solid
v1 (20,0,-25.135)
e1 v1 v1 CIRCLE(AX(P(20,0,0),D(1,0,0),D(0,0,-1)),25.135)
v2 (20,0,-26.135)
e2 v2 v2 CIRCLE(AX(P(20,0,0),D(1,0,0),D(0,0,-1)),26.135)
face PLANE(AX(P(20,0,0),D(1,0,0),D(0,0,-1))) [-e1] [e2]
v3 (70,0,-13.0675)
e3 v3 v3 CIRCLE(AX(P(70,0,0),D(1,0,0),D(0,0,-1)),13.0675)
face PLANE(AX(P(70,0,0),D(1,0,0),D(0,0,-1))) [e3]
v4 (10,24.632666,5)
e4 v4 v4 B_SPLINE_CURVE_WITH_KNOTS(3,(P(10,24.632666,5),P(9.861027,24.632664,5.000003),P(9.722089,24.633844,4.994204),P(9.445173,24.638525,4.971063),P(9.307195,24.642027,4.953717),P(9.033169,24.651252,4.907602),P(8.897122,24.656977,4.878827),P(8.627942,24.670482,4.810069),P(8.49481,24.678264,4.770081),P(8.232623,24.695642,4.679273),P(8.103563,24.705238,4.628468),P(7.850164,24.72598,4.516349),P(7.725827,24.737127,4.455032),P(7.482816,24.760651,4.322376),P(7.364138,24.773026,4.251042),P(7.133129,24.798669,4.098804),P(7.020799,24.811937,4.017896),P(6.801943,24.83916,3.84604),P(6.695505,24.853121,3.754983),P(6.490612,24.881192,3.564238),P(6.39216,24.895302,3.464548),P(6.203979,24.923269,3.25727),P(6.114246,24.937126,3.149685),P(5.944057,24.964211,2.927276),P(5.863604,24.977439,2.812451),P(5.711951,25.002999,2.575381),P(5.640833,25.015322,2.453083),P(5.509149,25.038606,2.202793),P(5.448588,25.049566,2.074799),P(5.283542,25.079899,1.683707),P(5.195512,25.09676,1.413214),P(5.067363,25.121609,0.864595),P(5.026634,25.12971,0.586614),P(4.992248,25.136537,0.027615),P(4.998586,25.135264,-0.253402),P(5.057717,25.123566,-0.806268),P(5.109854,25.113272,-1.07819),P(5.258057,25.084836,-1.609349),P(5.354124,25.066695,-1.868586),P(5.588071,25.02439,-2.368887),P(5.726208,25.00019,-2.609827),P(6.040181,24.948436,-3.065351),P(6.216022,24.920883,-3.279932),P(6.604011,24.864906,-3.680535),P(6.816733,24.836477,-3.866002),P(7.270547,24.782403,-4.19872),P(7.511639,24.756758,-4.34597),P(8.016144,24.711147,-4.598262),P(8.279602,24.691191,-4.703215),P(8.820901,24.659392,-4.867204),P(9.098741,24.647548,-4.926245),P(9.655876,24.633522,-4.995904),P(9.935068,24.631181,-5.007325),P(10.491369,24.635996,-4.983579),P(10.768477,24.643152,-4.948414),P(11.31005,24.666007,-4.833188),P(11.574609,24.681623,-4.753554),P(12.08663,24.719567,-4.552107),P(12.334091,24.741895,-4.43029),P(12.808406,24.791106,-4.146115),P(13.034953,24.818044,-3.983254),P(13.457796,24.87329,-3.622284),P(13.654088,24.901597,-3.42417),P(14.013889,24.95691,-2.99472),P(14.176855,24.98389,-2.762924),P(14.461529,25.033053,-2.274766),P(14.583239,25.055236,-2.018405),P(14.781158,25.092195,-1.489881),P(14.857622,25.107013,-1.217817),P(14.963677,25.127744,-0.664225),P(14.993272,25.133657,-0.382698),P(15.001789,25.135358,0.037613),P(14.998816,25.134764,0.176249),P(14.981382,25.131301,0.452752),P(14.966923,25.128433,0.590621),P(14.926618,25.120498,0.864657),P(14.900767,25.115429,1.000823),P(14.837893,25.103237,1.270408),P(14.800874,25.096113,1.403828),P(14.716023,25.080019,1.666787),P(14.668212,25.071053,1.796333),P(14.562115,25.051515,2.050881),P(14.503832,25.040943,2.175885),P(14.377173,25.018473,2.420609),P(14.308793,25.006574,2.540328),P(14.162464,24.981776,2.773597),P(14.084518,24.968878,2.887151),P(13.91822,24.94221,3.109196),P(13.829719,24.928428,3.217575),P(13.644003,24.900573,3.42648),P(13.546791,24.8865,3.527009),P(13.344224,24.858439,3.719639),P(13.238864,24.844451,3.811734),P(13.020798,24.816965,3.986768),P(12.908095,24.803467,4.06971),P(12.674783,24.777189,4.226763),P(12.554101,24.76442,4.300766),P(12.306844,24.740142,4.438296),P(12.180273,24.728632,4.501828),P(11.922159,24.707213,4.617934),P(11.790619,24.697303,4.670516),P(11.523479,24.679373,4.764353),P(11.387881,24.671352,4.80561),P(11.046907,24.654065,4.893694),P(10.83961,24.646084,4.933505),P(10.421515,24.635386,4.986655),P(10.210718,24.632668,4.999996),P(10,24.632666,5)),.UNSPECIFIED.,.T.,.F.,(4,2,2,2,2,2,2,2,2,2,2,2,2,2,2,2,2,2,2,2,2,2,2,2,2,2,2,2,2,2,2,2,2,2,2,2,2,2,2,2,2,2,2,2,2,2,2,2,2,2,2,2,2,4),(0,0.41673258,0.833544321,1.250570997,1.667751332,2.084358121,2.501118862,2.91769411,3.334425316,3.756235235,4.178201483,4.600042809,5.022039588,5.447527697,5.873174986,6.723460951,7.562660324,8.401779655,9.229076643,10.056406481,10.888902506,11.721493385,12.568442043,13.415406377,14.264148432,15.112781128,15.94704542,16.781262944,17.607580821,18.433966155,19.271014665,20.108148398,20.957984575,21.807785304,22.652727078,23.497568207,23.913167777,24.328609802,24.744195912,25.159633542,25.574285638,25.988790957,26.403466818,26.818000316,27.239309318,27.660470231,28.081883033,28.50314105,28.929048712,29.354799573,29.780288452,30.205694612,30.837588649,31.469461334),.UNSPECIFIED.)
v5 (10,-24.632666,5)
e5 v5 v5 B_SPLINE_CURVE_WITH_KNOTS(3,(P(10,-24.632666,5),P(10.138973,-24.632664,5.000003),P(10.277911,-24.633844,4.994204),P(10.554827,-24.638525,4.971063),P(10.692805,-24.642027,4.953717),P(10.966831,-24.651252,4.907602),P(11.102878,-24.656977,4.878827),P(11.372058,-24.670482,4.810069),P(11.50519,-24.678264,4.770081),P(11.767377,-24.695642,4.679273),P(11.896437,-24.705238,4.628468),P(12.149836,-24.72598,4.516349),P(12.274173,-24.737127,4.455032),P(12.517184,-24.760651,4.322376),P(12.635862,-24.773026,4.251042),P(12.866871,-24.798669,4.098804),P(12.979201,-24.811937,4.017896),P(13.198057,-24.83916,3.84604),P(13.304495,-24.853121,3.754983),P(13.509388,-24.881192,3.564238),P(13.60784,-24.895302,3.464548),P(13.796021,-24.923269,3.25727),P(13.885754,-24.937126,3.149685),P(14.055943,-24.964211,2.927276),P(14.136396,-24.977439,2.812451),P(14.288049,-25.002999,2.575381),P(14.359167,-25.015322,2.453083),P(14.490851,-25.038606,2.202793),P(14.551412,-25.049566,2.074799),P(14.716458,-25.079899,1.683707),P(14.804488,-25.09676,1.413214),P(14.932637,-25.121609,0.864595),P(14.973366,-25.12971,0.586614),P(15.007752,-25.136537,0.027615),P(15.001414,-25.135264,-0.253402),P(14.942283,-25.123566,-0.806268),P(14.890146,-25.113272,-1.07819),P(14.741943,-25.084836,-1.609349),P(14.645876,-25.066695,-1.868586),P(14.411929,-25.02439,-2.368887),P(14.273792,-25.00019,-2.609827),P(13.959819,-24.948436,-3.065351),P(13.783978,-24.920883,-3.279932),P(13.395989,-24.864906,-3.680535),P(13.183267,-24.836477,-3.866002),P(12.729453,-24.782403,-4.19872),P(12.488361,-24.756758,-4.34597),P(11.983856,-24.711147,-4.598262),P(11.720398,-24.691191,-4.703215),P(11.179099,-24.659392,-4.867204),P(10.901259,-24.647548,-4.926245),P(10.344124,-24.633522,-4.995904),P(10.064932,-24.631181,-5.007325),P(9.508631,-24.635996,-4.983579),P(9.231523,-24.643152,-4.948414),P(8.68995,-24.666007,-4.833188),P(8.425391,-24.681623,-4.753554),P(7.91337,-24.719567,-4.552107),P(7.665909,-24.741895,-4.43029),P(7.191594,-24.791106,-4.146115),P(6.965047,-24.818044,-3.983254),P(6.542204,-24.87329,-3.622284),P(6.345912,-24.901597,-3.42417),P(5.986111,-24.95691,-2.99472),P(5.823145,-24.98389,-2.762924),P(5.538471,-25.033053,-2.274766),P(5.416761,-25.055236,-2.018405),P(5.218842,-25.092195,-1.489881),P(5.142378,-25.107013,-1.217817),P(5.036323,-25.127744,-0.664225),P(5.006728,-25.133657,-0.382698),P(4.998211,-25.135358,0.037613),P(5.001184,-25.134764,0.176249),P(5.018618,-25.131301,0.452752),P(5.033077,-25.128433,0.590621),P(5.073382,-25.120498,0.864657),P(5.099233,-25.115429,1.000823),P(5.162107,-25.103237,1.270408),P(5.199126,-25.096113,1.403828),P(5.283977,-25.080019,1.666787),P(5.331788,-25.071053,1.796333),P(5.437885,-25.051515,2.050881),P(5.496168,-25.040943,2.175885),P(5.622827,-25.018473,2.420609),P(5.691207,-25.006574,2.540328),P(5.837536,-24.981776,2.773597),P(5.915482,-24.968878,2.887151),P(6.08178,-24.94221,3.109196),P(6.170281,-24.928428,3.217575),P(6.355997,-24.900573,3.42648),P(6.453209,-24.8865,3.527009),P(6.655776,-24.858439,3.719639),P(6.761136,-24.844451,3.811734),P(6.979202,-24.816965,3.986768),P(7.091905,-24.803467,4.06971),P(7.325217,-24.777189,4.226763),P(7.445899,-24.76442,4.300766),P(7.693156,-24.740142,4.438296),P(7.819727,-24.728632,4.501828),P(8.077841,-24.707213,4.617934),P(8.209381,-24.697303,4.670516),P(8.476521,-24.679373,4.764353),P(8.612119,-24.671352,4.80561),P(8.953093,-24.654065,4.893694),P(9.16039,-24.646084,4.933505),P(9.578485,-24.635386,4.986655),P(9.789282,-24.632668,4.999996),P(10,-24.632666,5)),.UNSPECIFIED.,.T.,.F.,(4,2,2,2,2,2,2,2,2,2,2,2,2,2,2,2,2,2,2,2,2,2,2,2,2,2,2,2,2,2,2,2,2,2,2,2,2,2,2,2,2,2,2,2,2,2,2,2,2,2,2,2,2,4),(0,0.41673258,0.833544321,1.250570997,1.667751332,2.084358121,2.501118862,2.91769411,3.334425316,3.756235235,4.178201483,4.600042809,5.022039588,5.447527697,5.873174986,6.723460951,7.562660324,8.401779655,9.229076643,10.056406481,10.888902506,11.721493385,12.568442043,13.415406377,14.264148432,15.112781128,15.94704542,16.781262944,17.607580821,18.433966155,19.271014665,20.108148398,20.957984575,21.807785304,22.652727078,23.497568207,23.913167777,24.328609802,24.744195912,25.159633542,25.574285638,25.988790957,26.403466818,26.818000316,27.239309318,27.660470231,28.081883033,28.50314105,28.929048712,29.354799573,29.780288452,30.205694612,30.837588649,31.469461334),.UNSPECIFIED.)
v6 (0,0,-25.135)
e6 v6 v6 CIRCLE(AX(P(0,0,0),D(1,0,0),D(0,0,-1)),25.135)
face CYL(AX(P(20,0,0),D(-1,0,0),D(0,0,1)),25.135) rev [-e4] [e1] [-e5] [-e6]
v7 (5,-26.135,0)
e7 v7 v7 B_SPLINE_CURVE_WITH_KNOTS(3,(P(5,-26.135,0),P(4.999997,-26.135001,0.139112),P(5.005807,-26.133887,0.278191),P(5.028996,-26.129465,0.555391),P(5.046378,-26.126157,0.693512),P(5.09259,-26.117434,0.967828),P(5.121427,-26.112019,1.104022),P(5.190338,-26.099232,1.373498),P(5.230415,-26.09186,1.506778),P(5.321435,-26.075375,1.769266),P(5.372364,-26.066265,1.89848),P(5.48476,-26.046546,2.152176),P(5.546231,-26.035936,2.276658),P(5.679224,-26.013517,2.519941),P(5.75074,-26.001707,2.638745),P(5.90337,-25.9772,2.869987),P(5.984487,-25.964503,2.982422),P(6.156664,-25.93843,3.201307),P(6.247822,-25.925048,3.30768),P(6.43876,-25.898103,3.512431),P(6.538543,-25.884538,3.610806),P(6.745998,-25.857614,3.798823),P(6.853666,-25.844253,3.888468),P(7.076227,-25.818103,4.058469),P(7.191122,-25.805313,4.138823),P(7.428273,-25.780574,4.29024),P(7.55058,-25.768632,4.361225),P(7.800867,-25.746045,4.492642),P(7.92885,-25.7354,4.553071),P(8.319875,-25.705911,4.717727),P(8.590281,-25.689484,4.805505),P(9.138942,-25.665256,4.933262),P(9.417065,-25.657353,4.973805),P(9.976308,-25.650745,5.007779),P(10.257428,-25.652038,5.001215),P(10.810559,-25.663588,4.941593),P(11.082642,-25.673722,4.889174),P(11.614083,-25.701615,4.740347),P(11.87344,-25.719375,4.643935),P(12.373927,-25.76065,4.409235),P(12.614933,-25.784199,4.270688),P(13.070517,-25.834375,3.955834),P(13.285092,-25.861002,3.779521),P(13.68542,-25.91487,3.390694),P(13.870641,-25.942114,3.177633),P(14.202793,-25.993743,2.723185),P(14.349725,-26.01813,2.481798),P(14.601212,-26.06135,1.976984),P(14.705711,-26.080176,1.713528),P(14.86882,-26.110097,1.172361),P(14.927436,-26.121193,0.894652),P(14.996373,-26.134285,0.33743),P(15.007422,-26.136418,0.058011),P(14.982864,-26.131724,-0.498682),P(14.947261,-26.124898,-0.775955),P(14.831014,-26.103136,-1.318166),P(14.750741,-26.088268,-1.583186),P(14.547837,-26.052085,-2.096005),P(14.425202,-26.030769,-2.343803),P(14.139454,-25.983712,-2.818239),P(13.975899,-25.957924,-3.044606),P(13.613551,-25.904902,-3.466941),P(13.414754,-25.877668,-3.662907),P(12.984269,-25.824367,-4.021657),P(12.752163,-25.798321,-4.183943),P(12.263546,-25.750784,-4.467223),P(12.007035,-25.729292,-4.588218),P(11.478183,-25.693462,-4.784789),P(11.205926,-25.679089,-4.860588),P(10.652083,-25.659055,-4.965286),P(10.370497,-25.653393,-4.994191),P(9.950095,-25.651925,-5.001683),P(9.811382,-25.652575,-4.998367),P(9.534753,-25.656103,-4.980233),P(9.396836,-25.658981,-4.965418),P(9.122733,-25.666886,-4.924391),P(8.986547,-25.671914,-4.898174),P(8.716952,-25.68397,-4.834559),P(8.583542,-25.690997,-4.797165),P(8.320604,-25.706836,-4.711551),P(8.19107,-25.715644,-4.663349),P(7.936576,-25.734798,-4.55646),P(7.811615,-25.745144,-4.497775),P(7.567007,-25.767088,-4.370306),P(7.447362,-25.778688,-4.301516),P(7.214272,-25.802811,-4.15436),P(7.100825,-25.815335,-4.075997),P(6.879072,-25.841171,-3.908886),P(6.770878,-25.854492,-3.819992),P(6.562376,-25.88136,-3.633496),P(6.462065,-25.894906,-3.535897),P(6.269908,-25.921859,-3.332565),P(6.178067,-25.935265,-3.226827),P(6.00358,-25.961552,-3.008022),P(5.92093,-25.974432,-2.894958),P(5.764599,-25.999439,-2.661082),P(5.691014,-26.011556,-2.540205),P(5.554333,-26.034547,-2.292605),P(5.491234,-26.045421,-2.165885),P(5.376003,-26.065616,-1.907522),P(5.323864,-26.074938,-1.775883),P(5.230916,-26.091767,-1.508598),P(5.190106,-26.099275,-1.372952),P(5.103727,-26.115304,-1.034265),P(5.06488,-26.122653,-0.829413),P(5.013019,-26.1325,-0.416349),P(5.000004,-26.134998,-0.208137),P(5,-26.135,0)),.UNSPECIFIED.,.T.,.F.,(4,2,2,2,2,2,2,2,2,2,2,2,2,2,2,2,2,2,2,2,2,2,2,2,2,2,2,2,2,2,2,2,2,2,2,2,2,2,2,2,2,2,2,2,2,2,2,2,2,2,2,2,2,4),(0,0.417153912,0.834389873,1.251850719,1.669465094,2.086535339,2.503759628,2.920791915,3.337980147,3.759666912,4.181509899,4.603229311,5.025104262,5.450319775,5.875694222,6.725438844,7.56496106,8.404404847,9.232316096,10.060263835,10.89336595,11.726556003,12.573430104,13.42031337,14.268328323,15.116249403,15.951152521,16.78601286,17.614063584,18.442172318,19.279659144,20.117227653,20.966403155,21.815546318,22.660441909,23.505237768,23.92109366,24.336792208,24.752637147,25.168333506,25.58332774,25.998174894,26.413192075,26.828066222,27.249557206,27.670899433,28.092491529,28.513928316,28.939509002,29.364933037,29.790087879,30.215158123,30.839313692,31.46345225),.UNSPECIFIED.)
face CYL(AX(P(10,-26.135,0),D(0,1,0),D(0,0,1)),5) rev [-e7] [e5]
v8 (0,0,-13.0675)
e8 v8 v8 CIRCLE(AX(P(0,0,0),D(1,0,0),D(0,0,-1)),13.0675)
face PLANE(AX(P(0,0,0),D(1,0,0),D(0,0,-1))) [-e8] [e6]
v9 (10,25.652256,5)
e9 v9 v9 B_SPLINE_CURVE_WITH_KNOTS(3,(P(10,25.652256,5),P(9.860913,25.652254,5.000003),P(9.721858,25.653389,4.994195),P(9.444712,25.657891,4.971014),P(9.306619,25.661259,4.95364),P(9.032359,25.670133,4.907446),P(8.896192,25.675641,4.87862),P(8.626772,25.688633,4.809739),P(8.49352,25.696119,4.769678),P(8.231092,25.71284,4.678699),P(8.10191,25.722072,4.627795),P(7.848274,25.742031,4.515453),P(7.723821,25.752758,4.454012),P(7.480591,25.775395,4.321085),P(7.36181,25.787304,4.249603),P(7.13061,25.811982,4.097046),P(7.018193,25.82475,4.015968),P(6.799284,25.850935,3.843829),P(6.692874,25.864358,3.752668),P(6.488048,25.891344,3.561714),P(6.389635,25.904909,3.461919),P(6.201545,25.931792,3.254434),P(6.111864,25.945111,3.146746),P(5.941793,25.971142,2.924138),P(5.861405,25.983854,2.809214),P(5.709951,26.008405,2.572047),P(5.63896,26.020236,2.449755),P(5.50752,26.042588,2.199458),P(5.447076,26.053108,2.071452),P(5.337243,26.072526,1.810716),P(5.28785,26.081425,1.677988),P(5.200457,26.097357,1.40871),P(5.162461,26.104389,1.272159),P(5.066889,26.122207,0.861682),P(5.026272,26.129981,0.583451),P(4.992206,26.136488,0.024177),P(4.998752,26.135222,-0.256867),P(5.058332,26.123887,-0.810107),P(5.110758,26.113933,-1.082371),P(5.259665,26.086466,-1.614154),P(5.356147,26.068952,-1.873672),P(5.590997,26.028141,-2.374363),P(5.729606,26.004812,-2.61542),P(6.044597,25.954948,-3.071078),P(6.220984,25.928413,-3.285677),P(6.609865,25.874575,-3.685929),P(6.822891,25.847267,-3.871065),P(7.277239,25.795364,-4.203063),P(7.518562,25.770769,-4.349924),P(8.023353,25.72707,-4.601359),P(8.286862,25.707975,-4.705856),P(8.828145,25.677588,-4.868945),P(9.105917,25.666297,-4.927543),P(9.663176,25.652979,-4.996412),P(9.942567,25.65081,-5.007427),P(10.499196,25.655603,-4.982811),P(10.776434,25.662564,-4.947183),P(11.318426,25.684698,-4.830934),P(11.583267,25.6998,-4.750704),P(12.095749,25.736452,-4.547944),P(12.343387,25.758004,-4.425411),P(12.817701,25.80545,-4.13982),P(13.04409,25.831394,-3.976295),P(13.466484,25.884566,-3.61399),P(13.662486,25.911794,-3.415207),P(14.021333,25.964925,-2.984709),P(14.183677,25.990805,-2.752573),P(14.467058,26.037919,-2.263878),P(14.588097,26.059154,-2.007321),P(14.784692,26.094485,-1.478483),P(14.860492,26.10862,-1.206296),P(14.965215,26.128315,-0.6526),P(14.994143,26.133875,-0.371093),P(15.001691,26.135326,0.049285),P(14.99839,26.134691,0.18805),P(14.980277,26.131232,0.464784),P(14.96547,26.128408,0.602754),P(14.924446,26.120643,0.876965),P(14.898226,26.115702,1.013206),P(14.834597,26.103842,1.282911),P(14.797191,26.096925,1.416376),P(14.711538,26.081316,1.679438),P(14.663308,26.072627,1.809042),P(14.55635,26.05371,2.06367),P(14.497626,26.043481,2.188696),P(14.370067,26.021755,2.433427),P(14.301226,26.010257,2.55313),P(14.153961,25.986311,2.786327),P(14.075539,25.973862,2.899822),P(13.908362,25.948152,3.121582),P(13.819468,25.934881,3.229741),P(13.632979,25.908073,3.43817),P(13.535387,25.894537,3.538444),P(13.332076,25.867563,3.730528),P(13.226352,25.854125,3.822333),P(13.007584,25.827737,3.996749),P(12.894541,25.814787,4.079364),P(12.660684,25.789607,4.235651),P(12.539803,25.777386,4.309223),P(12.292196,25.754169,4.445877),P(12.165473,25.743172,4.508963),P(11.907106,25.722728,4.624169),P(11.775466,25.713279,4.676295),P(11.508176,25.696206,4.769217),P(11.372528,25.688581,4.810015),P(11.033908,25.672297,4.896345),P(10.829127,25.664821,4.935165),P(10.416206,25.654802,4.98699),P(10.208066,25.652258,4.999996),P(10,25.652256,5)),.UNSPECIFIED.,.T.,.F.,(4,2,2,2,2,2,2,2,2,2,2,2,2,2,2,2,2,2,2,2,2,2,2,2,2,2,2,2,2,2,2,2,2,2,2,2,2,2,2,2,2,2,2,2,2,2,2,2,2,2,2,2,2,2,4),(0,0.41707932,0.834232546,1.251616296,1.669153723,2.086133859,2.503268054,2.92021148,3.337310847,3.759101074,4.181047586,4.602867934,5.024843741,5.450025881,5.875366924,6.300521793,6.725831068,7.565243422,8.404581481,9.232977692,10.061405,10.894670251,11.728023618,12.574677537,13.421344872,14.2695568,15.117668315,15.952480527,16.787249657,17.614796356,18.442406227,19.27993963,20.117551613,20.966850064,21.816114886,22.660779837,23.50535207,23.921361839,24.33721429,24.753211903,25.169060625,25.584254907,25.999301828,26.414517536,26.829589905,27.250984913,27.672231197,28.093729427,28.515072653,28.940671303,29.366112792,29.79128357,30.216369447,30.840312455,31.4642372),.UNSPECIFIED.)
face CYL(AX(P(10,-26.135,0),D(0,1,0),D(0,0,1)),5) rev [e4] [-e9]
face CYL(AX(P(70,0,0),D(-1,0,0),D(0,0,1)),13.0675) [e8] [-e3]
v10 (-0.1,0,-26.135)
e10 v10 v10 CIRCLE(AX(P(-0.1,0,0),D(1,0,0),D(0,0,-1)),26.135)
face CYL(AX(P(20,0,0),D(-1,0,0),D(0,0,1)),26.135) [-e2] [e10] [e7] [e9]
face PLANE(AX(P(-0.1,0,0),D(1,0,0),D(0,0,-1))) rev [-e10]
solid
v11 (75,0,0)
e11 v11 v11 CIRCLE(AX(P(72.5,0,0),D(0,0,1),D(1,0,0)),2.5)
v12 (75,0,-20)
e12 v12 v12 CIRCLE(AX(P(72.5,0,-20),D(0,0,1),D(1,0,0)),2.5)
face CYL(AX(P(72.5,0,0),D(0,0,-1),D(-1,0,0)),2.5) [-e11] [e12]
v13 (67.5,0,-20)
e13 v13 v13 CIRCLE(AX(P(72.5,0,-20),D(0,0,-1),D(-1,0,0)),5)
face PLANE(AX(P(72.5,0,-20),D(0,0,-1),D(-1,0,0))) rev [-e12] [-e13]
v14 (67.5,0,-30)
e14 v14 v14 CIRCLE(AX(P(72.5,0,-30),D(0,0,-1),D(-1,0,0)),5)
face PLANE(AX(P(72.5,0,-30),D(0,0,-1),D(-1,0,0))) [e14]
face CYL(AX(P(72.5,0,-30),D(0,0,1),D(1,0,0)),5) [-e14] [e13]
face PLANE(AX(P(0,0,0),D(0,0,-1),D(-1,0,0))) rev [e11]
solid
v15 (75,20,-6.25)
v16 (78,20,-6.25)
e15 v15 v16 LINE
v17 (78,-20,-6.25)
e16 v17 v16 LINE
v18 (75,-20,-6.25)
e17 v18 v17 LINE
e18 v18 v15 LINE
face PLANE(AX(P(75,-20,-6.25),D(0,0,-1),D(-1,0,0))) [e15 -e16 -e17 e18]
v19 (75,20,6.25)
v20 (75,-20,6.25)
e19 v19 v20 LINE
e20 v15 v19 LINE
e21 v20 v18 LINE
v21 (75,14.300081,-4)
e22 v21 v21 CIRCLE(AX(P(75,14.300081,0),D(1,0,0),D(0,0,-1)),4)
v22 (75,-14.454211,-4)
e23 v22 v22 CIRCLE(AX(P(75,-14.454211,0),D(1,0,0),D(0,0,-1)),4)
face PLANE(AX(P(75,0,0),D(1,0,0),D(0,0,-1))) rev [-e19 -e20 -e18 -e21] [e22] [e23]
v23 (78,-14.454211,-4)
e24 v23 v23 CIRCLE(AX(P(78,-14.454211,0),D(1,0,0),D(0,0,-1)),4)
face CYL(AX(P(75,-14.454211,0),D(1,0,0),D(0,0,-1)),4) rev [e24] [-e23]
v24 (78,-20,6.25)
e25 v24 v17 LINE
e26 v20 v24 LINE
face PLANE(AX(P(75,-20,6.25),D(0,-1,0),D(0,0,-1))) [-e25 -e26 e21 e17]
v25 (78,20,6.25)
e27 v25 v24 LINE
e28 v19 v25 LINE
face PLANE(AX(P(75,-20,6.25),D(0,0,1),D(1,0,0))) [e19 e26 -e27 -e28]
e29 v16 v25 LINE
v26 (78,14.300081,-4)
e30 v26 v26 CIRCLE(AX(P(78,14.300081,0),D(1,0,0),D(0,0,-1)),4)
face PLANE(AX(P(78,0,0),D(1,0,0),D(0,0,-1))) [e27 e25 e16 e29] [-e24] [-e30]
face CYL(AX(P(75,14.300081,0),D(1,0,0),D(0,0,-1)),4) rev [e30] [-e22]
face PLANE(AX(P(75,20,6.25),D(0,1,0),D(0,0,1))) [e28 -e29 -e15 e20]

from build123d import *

# Parameters (mm, degrees)
SKETCH1_R               = 26.135
SKETCH1_R_2             = 25.135
EXTRUDE_THIN1_DEPTH     = 20
BOSS_EXTRUDE1_START     = -0.1
SKETCH3_R               = 26.135
BOSS_EXTRUDE1_DEPTH     = 0.1
CUT_EXTRUDE1_DEPTH      = 43.024712373
CUT_EXTRUDE1_DEPTH_BACK = 43.024712373
SKETCH4_R               = 5
SKETCH7_R               = 13.0675
BOSS_EXTRUDE2_DEPTH     = 70
BOSS_EXTRUDE3_START     = -20
BOSS_EXTRUDE3_OUTLINE_R = 2.5
BOSS_EXTRUDE3_DEPTH     = 20
SKETCH8_R               = 5
BOSS_EXTRUDE4_DEPTH     = 10
F_3DSKETCH2_R           = 4
BOSS_EXTRUDE5_DEPTH     = 3


# Read off the part's stored shape, not the designer's step: Boss-Extrude3
with BuildPart() as part:
    # Sketch1 → Extrude-Thin1 (new body)
    with BuildSketch(Plane(origin=(0, 0, 0), x_dir=(0, 0, -1), z_dir=(1, 0, 0))):
        Circle(SKETCH1_R)
        Circle(SKETCH1_R_2, mode=Mode.SUBTRACT)
    extrude(amount=EXTRUDE_THIN1_DEPTH)

    # Sketch3 → Boss-Extrude1 (add)
    with BuildSketch(Plane(origin=(0, 0, 0), x_dir=(0, 0, -1), z_dir=(1, 0, 0)).offset(BOSS_EXTRUDE1_START)):
        Circle(SKETCH3_R)
    extrude(amount=BOSS_EXTRUDE1_DEPTH)

    # Sketch4 → Cut-Extrude1 (cut, two sides: drawn at the far end of the back side and taken through both)
    with BuildSketch(Plane(origin=(0, 0, 0), x_dir=(1, 0, 0), z_dir=(0, 1, 0)).offset(-CUT_EXTRUDE1_DEPTH_BACK)):
        with Locations(Location((10, 0, 0), (0, 0, 270))):
            Circle(SKETCH4_R)
    extrude(amount=CUT_EXTRUDE1_DEPTH + CUT_EXTRUDE1_DEPTH_BACK, mode=Mode.SUBTRACT)

    # Sketch7 → Boss-Extrude2 (add)
    with BuildSketch(Plane(origin=(0, 0, 0), x_dir=(0, 0, -1), z_dir=(1, 0, 0))):
        Circle(SKETCH7_R)
    extrude(amount=BOSS_EXTRUDE2_DEPTH)


with BuildPart() as body_2:
    # Boss-Extrude3 outline → Boss-Extrude3 (new body)
    with BuildSketch(Plane.XY.offset(BOSS_EXTRUDE3_START)):
        with Locations((72.5, 0)):
            Circle(BOSS_EXTRUDE3_OUTLINE_R)
    extrude(amount=BOSS_EXTRUDE3_DEPTH)

    # Sketch8 → Boss-Extrude4 (add)
    with BuildSketch(Plane(origin=(0, 0, -20), x_dir=(-1, 0, 0), z_dir=(0, 0, -1))):
        with Locations((-72.5, 0)):
            Circle(SKETCH8_R)
    extrude(amount=BOSS_EXTRUDE4_DEPTH)


with BuildPart() as body_3:
    # 3DSketch2 → Boss-Extrude5 (new body)
    with BuildSketch(Plane(origin=(75, -20, 6.25), x_dir=(0, 0.9544799780350297, -0.2982749931359468), z_dir=(-1, 0, 0))):
        Polygon((0, 0), (3.728437414, 11.930999725), (41.907636536, 0), (38.179199121, -11.930999725), align=None)
        with Locations(Location((34.602959725, -4.265356706, 0), (0, 0, 72.645975364))):
            Circle(F_3DSKETCH2_R, mode=Mode.SUBTRACT)
        with Locations(Location((7.157563346, 4.311329663, 0), (0, 0, 72.645975364))):
            Circle(F_3DSKETCH2_R, mode=Mode.SUBTRACT)
    extrude(amount=-BOSS_EXTRUDE5_DEPTH)


solid = Compound([part.part, body_2.part, body_3.part])
